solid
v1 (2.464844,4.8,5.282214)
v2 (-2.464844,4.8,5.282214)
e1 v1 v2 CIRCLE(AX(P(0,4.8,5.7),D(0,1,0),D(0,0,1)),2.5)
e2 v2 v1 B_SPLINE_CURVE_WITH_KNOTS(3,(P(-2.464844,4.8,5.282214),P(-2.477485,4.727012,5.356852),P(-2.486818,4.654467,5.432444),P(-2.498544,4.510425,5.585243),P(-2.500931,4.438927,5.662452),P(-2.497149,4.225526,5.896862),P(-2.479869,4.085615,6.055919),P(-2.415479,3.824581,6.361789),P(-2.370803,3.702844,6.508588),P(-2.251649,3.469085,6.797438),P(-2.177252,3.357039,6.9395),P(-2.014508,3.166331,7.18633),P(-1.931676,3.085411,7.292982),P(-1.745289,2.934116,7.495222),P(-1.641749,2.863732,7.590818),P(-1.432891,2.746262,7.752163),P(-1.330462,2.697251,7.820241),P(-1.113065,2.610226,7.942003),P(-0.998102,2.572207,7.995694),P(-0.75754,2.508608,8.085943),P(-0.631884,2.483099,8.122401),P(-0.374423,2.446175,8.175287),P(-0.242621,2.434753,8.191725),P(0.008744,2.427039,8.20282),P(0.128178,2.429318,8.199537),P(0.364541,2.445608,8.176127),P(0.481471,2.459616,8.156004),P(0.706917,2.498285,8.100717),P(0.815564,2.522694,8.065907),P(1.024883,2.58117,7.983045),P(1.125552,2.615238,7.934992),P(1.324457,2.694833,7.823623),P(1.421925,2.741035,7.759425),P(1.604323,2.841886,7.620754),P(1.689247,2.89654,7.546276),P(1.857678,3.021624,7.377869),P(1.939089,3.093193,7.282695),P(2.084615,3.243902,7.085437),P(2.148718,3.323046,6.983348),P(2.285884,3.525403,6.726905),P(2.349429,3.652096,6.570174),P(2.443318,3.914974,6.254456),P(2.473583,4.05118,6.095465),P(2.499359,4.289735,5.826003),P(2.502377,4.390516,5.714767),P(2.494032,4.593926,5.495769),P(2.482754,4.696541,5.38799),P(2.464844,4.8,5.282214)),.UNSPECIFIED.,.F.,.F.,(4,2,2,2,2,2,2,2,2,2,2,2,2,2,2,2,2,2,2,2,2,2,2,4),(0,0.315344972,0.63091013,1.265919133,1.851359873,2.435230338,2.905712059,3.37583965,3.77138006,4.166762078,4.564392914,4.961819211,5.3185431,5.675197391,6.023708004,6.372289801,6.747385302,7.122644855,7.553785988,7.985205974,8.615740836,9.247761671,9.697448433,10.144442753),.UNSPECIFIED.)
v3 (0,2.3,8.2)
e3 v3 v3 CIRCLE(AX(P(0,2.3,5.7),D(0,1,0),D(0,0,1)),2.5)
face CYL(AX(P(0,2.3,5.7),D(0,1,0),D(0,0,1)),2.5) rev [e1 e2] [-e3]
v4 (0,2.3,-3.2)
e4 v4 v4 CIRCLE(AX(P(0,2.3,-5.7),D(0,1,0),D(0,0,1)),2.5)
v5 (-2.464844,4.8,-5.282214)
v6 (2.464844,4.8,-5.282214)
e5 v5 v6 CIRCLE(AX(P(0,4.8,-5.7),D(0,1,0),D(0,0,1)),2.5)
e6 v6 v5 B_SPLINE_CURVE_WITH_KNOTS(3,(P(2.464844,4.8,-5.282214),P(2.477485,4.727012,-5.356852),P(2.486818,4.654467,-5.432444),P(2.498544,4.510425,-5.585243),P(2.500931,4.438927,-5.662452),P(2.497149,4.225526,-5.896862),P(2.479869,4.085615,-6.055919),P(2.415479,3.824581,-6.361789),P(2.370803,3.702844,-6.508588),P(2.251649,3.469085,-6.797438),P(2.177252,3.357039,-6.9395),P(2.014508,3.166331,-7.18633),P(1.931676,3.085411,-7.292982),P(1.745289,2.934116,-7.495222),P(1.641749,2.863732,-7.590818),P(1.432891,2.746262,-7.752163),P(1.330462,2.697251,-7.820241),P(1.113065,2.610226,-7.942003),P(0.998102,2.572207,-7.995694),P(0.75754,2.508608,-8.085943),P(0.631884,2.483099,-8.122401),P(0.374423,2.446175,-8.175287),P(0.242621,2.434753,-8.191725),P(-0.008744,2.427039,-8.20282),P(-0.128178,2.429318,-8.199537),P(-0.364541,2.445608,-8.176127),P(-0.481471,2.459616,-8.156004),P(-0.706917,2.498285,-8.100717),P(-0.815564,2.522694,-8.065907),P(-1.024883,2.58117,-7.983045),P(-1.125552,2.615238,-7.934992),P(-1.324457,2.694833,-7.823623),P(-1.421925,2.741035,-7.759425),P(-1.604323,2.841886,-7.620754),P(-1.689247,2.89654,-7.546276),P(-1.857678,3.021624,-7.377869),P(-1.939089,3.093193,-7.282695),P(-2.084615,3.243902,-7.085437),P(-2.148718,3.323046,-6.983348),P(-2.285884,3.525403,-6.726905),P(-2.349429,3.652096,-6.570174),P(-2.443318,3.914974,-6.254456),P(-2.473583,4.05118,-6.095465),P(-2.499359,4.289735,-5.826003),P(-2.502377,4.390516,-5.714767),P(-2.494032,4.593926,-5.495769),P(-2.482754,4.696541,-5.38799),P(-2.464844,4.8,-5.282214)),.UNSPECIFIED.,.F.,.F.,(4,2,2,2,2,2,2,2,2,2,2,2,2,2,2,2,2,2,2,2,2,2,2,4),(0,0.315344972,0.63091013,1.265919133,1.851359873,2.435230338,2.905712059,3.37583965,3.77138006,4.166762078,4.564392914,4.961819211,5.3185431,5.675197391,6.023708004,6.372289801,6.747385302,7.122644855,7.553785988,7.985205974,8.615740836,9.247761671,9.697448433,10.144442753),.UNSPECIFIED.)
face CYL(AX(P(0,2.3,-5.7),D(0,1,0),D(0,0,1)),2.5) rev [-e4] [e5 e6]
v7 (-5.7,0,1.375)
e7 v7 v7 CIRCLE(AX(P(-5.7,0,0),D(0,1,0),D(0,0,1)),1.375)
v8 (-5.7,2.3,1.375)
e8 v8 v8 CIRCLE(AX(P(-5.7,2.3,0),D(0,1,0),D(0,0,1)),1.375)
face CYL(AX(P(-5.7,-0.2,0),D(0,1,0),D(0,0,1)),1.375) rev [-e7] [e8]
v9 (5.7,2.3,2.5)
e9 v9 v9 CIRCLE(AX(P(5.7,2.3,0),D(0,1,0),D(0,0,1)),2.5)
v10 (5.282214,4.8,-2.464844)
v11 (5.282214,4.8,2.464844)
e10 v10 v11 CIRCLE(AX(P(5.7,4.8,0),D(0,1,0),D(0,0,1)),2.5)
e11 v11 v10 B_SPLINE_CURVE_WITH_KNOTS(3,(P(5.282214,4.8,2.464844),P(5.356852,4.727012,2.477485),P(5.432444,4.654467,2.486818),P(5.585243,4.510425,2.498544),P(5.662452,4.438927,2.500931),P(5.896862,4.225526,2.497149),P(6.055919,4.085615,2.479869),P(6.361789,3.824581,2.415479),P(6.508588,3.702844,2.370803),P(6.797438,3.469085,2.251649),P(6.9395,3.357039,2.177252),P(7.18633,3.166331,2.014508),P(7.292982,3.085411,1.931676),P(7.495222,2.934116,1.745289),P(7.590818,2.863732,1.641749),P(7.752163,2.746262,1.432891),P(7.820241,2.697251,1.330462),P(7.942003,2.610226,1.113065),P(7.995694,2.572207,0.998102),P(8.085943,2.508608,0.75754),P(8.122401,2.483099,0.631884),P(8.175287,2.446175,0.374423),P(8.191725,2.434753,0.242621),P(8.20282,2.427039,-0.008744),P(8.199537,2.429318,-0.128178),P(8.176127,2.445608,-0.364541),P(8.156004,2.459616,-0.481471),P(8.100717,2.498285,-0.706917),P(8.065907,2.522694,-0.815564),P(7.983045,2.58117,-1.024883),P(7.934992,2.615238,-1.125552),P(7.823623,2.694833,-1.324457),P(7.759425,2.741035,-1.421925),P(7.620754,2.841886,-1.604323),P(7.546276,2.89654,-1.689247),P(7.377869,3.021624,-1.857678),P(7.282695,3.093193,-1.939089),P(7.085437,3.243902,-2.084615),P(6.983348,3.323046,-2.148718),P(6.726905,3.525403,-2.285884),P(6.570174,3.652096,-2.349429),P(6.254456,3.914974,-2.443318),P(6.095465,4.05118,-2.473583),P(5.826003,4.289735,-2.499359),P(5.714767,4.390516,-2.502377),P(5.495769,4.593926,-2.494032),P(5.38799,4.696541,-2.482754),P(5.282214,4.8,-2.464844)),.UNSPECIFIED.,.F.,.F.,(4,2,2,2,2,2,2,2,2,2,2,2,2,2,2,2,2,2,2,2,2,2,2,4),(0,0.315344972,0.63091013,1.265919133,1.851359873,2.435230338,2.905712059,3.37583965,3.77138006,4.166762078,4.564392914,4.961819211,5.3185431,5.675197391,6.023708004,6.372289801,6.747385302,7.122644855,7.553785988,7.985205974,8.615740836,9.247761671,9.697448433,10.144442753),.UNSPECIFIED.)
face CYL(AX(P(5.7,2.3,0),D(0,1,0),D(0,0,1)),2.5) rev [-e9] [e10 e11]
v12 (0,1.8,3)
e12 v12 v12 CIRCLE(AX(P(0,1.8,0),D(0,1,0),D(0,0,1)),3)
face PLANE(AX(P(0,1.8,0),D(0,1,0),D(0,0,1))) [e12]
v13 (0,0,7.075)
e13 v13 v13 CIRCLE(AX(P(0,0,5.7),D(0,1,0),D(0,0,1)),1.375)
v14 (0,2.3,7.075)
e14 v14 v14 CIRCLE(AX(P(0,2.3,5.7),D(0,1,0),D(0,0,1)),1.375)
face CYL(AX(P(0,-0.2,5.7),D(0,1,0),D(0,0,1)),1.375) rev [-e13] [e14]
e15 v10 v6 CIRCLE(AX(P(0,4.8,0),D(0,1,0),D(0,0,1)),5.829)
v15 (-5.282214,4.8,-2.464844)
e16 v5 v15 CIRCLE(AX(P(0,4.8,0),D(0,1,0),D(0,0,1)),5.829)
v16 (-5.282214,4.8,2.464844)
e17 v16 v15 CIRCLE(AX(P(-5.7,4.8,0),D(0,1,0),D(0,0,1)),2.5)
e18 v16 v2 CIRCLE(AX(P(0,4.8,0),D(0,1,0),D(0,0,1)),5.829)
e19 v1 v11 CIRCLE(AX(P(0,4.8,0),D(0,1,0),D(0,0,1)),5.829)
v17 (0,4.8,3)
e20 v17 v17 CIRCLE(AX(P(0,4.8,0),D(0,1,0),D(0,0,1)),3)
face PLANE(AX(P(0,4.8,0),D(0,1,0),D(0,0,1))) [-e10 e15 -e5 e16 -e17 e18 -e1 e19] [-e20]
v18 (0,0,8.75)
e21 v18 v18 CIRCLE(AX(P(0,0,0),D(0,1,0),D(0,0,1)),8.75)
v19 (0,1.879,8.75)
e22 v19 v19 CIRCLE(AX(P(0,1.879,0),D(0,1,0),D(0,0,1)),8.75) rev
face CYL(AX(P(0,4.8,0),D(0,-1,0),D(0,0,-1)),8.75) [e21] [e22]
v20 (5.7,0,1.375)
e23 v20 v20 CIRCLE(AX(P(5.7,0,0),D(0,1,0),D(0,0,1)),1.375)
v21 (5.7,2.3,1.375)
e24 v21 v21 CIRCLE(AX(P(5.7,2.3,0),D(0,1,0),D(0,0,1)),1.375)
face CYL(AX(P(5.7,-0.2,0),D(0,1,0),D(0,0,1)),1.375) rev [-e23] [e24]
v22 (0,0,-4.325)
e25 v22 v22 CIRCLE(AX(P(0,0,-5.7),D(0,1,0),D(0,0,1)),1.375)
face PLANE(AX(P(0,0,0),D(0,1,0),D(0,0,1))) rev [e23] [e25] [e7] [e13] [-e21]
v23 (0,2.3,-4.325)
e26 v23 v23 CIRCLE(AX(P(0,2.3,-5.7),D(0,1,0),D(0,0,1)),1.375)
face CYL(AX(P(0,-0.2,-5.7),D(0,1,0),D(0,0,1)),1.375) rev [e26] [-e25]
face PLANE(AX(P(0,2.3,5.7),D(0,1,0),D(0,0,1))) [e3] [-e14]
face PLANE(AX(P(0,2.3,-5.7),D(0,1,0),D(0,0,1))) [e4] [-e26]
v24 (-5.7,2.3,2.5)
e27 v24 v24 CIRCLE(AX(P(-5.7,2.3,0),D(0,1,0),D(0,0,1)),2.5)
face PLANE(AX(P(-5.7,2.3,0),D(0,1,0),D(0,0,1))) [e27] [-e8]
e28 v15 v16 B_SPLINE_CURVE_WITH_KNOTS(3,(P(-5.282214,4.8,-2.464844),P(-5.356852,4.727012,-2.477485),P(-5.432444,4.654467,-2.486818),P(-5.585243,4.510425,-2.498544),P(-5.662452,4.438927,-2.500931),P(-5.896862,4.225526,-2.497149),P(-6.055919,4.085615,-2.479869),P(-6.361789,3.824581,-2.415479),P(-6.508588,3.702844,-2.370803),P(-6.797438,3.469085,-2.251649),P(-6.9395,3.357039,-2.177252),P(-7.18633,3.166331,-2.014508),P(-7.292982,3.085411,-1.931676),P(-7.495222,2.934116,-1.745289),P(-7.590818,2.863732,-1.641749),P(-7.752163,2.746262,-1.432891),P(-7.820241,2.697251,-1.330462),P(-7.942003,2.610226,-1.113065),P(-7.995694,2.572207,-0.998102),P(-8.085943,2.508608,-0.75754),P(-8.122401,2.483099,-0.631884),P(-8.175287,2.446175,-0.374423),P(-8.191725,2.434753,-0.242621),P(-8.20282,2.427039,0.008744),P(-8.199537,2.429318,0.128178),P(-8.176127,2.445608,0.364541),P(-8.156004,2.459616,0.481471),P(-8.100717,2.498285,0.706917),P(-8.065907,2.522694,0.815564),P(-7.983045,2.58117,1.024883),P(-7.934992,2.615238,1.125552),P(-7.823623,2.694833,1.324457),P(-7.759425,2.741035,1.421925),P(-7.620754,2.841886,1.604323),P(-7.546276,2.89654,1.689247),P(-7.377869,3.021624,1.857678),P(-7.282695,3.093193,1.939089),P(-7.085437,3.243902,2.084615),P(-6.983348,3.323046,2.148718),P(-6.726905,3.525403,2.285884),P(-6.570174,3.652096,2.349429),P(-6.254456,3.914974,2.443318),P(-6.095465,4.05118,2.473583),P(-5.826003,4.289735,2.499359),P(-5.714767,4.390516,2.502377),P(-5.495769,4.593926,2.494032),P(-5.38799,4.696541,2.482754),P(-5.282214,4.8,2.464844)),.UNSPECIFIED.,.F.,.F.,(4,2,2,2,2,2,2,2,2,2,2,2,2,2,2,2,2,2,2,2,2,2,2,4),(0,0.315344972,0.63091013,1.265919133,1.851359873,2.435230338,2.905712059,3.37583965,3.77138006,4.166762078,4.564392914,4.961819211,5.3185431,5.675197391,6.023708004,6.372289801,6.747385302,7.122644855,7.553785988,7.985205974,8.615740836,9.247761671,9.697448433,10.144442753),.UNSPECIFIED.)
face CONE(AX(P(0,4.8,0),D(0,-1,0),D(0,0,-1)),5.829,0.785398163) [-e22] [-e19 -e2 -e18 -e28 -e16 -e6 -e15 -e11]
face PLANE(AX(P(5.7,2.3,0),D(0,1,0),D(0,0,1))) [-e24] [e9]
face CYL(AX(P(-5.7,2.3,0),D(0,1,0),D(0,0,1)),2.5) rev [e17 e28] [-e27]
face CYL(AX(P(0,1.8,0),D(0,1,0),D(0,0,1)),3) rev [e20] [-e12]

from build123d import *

# Parameters (mm, degrees)
SKETCH1_R           = 8.75
BOSS_EXTRUDE1_DEPTH = 4.8
SKETCH2_R           = 3
CUT_EXTRUDE1_DEPTH  = 3
SKETCH3_R           = 2.5
CUT_EXTRUDE2_DEPTH  = 2.5
SKETCH4_R           = 1.375
CUT_EXTRUDE3_DEPTH  = 2.5
CHAMFER1_SIZE       = 2.921


with BuildPart() as part:
    # Sketch1 → Boss-Extrude1 (new body)
    with BuildSketch(Plane(origin=(0, 0, 0), x_dir=(1, 0, 0), z_dir=(0, 1, 0))):
        with Locations(Location((0, 0, 0), (0, 0, 270))):
            Circle(SKETCH1_R)
    extrude(amount=BOSS_EXTRUDE1_DEPTH)

    # Sketch2 → Cut-Extrude1 (cut)
    with BuildSketch(Plane(origin=(0, 4.8, 0), x_dir=(1, 0, 0), z_dir=(0, 1, 0))):
        with Locations(Location((0, 0, 0), (0, 0, 270))):
            Circle(SKETCH2_R)
    extrude(amount=-CUT_EXTRUDE1_DEPTH, mode=Mode.SUBTRACT)

    # Sketch3 → Cut-Extrude2 (cut)
    with BuildSketch(Plane(origin=(0, 4.8, 0), x_dir=(1, 0, 0), z_dir=(0, 1, 0))):
        with Locations(Location((-5.7, 0, 0), (0, 0, 270))):
            Circle(SKETCH3_R)
        with Locations(Location((0, 5.7, 0), (0, 0, 270))):
            Circle(SKETCH3_R)
        with Locations(Location((5.7, 0, 0), (0, 0, 270))):
            Circle(SKETCH3_R)
        with Locations(Location((0, -5.7, 0), (0, 0, 270))):
            Circle(SKETCH3_R)
    extrude(amount=-CUT_EXTRUDE2_DEPTH, mode=Mode.SUBTRACT)

    # Sketch4 → Cut-Extrude3 (cut)
    with BuildSketch(Plane(origin=(0, 2.3, 0), x_dir=(1, 0, 0), z_dir=(0, 1, 0))):
        with Locations(Location((-5.7, 0, 0), (0, 0, 270))):
            Circle(SKETCH4_R)
        with Locations(Location((0, 5.7, 0), (0, 0, 270))):
            Circle(SKETCH4_R)
        with Locations(Location((5.7, 0, 0), (0, 0, 270))):
            Circle(SKETCH4_R)
        with Locations(Location((0, -5.7, 0), (0, 0, 270))):
            Circle(SKETCH4_R)
    extrude(amount=-CUT_EXTRUDE3_DEPTH, mode=Mode.SUBTRACT)

    # Chamfer1
    # the kernel refuses this chamfer: 2.921 mm, written as the material it takes off along each edge
    with BuildSketch(Plane(origin=(0, 4.8, 0), x_dir=(0, 0, 1), z_dir=(-1, 0, 0))) as chamfer1_piece_1:
        Polygon((8.75, -CHAMFER1_SIZE), (8.75 - CHAMFER1_SIZE, 0), (8.75, 0), align=None)
    revolve(axis=Axis((0, 4.8, 0), (0, 1, 0)), mode=Mode.SUBTRACT)


solid = part.part
